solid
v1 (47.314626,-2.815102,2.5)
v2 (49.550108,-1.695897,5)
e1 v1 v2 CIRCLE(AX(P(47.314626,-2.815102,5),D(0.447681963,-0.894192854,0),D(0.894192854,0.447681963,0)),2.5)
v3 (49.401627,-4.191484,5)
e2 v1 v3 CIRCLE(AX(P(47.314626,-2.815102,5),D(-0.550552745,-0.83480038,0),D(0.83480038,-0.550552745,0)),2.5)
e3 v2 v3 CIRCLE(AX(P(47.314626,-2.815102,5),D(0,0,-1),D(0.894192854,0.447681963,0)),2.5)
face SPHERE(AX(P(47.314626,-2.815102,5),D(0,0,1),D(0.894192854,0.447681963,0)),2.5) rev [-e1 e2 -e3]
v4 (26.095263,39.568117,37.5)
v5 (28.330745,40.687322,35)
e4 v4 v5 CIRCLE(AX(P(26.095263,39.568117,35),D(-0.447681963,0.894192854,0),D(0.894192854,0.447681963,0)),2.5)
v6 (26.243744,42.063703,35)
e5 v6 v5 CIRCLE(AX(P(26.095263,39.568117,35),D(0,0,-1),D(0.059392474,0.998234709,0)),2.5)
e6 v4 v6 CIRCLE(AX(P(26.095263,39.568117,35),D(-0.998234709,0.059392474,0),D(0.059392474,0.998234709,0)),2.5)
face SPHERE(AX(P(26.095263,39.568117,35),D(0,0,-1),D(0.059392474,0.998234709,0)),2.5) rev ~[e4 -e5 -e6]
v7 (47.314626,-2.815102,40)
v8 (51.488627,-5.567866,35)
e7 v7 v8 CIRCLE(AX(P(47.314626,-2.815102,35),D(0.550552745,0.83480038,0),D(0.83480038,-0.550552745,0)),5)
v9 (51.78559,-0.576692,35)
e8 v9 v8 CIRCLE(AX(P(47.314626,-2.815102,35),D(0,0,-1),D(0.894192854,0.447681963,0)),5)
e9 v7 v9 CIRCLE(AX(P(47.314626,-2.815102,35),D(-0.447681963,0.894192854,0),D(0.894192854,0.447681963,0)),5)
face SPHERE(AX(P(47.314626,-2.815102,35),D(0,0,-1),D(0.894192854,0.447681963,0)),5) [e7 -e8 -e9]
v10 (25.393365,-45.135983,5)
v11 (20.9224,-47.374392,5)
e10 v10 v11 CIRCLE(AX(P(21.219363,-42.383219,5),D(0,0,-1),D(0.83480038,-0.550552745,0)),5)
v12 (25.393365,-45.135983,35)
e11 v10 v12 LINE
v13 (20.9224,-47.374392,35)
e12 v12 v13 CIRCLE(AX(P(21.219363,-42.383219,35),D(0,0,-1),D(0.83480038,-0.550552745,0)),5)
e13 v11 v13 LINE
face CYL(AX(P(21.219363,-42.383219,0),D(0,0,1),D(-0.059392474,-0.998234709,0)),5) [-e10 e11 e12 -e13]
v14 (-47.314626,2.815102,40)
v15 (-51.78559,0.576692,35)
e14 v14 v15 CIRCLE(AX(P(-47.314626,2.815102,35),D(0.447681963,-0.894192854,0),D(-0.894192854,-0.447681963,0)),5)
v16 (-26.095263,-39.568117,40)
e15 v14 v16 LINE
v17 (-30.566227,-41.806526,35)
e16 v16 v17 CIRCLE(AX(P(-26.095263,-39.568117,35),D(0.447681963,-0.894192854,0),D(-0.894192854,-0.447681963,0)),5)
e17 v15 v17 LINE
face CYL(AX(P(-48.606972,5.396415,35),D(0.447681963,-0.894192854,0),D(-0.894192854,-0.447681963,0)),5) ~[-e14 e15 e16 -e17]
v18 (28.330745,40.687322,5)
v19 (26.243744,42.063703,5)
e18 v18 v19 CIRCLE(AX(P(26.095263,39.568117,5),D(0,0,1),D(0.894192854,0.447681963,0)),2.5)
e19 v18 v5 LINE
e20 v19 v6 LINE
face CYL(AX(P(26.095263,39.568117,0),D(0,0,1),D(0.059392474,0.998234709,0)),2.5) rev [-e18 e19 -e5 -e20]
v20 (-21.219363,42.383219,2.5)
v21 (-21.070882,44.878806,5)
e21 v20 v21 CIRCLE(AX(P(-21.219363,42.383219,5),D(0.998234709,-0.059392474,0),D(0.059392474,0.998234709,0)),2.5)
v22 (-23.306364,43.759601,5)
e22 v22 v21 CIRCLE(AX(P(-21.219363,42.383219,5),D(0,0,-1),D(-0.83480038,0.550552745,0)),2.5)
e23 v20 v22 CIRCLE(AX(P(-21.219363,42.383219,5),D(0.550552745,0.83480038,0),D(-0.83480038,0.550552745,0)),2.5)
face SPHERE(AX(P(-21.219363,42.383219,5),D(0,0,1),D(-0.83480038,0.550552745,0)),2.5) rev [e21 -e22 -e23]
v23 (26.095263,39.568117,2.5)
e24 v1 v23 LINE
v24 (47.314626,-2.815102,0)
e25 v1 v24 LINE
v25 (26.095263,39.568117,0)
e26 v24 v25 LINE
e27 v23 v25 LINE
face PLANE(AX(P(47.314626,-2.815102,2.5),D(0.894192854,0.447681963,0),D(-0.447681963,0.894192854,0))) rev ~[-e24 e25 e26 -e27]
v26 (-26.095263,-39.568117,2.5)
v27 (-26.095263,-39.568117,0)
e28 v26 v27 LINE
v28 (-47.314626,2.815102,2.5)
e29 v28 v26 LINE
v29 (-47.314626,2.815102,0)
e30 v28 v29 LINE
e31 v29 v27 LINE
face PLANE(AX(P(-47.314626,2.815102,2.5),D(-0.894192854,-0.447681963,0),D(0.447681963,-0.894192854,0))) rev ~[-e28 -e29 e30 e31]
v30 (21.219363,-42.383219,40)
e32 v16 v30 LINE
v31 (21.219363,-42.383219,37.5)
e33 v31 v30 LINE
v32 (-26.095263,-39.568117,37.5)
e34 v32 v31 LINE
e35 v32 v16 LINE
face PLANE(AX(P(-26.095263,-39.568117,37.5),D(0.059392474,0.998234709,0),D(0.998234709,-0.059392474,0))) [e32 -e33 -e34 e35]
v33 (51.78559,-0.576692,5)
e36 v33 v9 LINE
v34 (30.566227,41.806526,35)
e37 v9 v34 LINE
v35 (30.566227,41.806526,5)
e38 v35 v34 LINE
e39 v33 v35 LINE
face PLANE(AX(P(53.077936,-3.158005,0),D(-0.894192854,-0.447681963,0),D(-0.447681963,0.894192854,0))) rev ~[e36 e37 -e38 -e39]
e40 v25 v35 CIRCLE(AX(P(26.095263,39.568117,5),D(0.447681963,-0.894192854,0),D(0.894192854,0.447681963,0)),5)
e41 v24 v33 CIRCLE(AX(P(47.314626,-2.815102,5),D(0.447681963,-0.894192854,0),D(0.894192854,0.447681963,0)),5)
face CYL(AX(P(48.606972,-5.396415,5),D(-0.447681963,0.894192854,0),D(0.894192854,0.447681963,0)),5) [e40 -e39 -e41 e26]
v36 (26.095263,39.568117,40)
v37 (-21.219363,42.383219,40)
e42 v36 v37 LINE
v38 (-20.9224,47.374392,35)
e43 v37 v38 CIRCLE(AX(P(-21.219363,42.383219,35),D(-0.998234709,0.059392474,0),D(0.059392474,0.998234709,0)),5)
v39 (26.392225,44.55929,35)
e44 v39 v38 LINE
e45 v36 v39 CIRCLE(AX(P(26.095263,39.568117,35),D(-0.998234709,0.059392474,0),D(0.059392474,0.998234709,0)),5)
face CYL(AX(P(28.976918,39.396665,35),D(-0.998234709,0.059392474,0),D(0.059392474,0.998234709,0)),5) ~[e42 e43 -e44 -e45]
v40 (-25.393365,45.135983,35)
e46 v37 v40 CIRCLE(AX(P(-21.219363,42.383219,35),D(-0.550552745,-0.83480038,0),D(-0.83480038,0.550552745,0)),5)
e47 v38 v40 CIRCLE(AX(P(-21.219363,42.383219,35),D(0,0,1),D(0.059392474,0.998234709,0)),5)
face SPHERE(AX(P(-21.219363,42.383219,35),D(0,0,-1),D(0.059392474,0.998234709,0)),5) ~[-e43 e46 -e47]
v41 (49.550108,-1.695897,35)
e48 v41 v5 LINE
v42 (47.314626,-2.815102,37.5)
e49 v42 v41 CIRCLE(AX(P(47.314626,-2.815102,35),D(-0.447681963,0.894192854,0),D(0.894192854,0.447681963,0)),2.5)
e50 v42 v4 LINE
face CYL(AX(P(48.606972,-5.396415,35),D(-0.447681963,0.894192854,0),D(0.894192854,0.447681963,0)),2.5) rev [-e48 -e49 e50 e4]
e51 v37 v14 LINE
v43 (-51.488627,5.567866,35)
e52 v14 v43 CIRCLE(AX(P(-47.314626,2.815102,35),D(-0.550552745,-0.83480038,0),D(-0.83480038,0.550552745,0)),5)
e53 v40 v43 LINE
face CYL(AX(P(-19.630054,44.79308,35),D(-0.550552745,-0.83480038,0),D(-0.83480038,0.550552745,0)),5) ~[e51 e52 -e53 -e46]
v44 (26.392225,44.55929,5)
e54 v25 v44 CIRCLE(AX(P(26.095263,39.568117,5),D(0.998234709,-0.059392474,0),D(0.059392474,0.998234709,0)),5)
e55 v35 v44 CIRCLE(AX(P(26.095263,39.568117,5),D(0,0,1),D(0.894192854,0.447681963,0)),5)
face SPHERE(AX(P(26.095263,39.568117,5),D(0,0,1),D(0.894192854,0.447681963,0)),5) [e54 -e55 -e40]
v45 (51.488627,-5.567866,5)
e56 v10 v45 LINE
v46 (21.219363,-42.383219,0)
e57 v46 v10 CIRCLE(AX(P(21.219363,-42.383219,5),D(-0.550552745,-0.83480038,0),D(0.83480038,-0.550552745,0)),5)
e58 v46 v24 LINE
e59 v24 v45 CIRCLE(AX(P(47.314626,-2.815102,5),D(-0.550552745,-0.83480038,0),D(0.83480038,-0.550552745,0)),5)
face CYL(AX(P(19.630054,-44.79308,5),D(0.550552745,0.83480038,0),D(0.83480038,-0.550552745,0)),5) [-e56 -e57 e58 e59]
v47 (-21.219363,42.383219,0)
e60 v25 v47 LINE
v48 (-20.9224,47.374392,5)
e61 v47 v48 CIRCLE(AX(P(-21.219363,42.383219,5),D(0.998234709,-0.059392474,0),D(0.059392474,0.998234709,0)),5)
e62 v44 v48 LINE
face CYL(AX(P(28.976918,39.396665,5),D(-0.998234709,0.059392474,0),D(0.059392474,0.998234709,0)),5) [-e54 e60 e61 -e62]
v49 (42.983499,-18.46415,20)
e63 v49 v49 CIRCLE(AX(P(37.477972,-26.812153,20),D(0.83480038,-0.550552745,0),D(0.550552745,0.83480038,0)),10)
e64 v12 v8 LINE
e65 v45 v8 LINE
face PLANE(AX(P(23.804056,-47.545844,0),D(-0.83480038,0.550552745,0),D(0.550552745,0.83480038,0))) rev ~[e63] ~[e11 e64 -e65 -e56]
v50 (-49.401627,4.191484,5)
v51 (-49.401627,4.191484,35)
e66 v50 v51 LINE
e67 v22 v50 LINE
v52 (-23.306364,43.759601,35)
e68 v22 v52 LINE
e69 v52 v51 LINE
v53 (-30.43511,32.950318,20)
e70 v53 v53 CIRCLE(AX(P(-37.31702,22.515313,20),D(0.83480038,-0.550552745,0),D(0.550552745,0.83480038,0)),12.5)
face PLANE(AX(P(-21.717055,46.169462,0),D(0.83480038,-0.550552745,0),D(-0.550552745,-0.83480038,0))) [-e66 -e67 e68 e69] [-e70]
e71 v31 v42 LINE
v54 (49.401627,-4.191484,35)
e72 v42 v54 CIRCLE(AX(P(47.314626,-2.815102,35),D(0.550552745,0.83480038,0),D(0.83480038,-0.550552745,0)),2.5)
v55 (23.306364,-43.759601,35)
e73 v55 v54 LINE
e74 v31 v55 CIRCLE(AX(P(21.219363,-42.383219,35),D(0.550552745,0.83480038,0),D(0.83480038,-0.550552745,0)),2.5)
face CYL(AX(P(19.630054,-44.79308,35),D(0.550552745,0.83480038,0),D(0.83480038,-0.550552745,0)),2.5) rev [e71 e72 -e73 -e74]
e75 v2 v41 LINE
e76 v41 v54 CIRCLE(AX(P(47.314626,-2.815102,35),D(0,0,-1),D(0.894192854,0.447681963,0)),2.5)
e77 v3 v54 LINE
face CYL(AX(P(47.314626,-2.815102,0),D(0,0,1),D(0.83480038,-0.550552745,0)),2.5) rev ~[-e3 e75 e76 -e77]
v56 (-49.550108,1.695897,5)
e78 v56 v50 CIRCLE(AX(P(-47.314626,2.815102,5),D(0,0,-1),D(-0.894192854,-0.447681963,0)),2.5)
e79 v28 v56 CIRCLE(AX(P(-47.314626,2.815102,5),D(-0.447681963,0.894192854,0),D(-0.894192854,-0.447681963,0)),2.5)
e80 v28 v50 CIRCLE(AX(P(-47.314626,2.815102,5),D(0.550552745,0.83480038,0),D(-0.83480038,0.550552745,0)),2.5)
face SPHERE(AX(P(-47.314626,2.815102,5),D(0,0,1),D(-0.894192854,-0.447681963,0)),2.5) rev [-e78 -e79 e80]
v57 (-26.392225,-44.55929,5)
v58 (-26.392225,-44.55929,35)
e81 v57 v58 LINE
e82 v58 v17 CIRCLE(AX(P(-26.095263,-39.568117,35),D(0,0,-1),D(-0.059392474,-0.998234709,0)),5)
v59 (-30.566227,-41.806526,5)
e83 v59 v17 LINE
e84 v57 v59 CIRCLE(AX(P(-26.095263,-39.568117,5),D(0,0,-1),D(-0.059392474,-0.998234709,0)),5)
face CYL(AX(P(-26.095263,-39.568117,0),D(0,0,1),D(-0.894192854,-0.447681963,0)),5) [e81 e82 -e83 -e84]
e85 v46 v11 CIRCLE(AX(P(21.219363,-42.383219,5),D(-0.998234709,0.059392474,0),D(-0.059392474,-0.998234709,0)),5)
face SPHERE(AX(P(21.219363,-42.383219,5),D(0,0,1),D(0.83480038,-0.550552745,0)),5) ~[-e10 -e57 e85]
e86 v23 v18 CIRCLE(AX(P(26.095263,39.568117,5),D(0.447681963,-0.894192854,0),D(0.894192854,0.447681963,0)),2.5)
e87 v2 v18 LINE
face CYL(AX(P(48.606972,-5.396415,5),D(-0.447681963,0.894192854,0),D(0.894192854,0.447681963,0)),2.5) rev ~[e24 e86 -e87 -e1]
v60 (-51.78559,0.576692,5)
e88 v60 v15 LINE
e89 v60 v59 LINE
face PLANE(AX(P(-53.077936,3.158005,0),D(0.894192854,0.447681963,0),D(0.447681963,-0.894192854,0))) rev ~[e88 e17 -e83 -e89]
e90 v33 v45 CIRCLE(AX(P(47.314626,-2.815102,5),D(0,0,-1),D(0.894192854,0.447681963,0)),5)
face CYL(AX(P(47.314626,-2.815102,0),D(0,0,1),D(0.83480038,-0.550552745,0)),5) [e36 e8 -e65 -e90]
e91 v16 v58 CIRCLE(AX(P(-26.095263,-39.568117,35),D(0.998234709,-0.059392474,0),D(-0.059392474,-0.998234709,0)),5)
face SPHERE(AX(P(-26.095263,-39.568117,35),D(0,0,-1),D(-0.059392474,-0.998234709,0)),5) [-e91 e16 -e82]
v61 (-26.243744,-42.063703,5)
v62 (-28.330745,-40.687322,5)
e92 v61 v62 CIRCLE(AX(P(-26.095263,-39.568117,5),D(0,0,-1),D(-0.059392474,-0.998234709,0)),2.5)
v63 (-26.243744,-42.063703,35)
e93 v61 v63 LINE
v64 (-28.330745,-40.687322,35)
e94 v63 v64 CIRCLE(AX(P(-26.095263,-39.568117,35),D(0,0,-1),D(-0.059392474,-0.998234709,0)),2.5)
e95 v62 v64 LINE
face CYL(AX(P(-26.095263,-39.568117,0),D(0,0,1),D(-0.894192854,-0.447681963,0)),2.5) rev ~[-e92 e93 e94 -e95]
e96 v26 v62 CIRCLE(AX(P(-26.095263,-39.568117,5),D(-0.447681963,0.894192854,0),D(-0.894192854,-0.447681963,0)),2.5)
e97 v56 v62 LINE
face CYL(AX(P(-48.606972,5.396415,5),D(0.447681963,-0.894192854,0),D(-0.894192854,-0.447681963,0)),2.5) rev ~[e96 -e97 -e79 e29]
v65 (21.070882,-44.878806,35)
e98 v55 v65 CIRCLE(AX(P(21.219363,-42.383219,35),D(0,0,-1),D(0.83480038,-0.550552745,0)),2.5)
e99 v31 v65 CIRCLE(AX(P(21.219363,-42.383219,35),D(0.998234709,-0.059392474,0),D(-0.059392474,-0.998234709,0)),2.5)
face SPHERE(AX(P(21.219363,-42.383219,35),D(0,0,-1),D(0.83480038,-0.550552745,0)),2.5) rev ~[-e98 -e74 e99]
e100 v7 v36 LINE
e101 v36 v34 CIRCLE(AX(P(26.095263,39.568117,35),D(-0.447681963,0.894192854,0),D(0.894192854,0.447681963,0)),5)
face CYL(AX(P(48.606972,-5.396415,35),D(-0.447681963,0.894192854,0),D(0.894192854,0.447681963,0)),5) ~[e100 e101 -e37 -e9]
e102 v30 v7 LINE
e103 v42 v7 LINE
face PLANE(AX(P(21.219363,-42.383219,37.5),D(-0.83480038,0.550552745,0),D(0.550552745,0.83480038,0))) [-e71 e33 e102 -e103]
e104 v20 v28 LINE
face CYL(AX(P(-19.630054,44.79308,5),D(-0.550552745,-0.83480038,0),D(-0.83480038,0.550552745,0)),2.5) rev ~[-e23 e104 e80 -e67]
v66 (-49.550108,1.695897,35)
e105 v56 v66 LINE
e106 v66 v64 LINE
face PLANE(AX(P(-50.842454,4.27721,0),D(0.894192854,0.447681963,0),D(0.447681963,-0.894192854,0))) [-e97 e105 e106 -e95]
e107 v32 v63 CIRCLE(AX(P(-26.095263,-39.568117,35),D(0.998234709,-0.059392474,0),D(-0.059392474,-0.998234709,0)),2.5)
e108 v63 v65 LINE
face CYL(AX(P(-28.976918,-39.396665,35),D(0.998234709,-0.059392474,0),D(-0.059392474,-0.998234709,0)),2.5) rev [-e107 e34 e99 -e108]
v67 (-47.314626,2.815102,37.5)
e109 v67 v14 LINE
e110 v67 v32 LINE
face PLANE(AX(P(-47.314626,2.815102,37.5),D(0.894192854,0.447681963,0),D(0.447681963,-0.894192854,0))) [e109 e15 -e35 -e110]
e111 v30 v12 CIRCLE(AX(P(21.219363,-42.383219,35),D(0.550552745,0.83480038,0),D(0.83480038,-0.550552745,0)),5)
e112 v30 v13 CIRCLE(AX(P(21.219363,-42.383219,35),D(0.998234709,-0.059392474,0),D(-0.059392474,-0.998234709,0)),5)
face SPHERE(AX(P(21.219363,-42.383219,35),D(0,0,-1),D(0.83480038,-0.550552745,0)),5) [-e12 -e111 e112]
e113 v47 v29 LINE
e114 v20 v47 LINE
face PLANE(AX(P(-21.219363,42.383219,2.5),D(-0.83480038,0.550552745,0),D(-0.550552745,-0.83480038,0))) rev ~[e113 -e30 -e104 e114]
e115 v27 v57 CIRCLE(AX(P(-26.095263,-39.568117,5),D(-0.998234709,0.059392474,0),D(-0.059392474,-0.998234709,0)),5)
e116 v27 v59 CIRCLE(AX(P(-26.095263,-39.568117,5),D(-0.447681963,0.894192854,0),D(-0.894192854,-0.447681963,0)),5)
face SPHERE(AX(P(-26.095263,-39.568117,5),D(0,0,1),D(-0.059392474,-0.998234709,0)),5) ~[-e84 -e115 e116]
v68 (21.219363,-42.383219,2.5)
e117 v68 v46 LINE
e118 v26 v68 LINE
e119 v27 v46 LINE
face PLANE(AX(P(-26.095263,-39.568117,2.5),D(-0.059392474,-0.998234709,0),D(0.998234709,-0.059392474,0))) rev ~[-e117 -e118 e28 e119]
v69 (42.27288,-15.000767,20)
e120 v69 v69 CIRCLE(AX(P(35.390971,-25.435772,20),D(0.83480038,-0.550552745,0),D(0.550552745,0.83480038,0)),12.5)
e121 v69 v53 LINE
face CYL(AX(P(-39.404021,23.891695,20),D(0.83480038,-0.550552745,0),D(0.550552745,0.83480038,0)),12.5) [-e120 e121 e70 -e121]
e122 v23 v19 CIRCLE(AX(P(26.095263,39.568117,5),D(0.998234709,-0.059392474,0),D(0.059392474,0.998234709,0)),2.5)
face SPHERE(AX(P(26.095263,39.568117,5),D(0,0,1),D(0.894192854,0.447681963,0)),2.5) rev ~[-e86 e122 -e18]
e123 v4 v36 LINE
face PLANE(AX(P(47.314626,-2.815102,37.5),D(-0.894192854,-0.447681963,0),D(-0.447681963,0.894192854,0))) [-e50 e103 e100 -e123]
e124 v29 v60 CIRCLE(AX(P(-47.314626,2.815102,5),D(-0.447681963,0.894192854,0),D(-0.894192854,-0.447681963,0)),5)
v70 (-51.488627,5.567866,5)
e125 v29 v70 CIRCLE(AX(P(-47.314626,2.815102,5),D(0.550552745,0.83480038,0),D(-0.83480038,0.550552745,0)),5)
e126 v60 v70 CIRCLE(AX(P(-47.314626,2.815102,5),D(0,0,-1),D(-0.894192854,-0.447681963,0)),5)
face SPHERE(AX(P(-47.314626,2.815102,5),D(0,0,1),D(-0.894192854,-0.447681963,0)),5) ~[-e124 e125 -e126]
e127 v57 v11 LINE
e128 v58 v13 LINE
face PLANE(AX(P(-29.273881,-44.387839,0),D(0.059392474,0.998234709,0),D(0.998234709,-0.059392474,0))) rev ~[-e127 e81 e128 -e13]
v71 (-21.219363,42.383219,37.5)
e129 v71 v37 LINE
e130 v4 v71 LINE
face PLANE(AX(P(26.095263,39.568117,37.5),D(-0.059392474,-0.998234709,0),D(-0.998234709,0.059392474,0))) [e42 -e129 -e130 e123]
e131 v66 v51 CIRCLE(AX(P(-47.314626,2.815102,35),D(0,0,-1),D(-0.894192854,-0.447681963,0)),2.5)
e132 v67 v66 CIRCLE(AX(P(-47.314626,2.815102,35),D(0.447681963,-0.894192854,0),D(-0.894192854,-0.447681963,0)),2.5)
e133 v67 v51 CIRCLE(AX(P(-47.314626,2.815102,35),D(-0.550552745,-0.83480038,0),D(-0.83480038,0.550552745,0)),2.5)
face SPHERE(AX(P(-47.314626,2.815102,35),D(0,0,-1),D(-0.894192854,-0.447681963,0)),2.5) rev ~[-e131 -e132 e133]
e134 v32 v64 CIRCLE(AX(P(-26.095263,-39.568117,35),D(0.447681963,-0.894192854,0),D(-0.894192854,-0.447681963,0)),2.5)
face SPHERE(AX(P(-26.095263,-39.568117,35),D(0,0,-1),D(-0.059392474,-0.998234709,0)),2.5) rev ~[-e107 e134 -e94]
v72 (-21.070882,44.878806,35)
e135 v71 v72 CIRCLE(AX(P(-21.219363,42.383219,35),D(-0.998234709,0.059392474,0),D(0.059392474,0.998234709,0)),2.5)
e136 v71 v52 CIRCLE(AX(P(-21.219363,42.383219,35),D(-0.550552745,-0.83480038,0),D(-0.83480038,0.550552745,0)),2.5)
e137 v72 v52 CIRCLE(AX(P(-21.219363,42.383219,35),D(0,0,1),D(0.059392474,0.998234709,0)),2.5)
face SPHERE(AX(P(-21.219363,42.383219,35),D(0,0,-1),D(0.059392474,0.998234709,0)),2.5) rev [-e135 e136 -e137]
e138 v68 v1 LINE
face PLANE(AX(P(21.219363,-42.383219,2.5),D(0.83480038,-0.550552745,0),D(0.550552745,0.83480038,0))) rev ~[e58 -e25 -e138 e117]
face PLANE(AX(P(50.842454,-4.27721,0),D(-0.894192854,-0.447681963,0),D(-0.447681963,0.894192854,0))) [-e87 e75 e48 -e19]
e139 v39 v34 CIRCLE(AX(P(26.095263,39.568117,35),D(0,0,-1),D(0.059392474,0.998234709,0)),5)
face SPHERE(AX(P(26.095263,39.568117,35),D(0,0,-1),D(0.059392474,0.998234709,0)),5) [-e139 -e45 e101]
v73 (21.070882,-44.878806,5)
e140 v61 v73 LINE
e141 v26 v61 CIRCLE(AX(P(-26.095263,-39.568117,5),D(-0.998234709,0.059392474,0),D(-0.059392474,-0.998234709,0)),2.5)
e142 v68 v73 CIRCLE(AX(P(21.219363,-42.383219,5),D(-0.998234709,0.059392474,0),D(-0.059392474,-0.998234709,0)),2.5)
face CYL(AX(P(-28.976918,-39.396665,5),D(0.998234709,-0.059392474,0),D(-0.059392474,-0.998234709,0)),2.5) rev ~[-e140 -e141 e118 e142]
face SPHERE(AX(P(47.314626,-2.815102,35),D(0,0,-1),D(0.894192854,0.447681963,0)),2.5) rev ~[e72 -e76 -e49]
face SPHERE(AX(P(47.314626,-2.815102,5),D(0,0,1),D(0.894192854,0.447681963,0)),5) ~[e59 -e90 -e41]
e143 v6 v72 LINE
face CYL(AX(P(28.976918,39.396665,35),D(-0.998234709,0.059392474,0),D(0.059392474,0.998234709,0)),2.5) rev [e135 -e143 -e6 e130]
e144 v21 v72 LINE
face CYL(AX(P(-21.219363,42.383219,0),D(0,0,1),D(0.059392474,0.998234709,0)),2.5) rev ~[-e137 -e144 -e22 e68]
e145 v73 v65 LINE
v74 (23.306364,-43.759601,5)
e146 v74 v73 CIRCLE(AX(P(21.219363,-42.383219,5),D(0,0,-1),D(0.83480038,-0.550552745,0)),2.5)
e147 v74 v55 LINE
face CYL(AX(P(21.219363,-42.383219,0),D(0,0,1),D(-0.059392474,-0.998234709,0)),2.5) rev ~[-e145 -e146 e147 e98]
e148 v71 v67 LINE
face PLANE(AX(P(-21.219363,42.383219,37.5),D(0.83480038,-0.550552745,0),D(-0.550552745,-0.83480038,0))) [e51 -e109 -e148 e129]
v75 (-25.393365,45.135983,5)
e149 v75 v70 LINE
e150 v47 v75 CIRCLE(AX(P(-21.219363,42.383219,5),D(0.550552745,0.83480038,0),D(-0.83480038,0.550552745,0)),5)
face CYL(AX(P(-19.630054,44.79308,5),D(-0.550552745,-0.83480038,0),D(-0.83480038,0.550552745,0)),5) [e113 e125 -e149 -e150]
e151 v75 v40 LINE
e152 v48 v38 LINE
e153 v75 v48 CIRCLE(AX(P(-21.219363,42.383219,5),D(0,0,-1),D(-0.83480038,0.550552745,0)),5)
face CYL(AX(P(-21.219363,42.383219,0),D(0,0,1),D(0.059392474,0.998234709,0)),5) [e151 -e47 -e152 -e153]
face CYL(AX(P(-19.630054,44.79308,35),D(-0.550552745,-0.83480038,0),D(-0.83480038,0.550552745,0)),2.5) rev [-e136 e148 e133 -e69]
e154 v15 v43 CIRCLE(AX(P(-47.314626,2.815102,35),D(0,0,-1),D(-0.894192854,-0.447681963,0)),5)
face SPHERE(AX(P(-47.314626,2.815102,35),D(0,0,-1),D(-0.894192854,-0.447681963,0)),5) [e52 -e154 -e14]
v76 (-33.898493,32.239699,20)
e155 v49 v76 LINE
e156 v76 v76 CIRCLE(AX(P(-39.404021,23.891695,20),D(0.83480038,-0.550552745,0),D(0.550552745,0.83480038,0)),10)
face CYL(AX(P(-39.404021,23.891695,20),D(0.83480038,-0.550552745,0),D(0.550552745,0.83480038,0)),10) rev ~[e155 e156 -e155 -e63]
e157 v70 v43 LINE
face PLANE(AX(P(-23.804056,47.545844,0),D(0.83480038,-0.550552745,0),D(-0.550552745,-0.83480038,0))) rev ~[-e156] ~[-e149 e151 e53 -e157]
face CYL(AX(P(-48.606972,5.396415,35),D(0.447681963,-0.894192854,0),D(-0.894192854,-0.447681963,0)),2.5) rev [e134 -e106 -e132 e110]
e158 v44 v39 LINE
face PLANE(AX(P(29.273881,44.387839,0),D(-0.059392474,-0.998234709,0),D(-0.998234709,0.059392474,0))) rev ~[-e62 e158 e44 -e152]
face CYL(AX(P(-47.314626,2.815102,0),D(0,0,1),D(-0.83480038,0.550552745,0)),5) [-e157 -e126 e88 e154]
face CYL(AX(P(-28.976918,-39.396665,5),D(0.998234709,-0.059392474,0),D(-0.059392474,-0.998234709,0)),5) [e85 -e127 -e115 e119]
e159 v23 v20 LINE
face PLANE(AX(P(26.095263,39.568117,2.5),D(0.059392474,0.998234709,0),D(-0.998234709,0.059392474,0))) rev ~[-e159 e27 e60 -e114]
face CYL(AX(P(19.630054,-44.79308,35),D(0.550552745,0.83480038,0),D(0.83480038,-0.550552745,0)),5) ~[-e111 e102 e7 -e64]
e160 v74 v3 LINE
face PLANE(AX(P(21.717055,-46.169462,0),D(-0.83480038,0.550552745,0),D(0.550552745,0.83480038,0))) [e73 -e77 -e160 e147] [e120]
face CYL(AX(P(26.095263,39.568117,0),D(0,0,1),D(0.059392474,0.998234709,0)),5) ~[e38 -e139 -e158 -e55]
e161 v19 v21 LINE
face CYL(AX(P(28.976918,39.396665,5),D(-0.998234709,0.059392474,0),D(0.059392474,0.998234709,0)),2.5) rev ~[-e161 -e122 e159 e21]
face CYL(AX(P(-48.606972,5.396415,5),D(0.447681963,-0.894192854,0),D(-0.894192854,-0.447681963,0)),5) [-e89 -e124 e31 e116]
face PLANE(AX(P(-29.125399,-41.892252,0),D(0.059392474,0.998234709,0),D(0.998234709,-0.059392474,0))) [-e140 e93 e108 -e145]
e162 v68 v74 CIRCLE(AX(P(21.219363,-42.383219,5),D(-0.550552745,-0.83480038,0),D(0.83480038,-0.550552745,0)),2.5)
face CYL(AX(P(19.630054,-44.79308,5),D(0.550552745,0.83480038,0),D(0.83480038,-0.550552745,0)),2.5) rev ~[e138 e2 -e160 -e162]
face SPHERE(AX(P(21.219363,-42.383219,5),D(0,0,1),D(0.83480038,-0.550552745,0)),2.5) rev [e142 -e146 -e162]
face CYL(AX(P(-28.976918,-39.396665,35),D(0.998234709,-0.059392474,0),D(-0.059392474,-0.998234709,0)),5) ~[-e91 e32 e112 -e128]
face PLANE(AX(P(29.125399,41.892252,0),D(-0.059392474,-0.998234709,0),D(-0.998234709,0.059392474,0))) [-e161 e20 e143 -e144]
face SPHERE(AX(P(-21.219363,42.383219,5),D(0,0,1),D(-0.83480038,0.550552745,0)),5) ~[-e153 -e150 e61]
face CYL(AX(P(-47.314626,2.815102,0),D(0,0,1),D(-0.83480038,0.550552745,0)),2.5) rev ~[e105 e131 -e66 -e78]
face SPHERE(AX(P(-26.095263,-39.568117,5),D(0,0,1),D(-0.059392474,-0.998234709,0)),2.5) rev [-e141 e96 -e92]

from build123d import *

# Parameters (mm, degrees)
F1_DEPTH       = 40
F2_R           = 5
F4_D           = 20
F4_CBORE_D     = 20
F4_CBORE_DEPTH = 20
F5_T           = -2.5


# Not quite as in the source:
# - a shell that OpenCascade refuses in one call is made with other operations: the cavity is built on its own and cut out


with BuildPart() as f1:
    # F0 (on Top) → F1 (new body)
    with BuildSketch(Plane.XY):
        Polygon((29.2738805136, 44.3878389125), (-23.8040558605, 47.5458436484), (-53.0779363741, 3.1580047359), (-29.2738805136, -44.3878389125), (23.8040558605, -47.5458436484), (53.0779363741, -3.1580047359), align=None)
    extrude(amount=F1_DEPTH)

    # F2
    f2_edges = [f1.edges().sort_by_distance(p)[0] for p in [
        (2.734912, 45.966841, 40),
        (41.175908, 20.614917, 40),
        (38.440996, -25.351924, 40),
        (-2.734912, -45.966841, 40),
        (-41.175908, -20.614917, 40),
        (-38.440996, 25.351924, 40),
        (29.273881, 44.387839, 20),
        (-23.804056, 47.545844, 20),
        (-53.077936, 3.158005, 20),
        (-29.273881, -44.387839, 20),
        (23.804056, -47.545844, 20),
        (53.077936, -3.158005, 20),
        (41.175908, 20.614917, 0),
        (38.440996, -25.351924, 0),
        (-2.734912, -45.966841, 0),
        (-41.175908, -20.614917, 0),
        (-38.440996, 25.351924, 0),
        (2.734912, 45.966841, 0),
    ]]
    fillet(f2_edges, radius=F2_R)

    # F4 (through all)
    with Locations(Plane(origin=(-38.4409961173, 25.3519241922, 0), x_dir=(-0.5505527454, -0.83480038, 0), z_dir=(-0.83480038, 0.5505527454, 0))):
        with Locations((1.7491957406, 20)):
            CounterBoreHole(F4_D / 2, F4_CBORE_D / 2, F4_CBORE_DEPTH)

    # F5: a shell. OpenCascade refuses it in one call, so the cavity is built on its own and cut out:
    # the body offset inwards by the wall thickness, plus a prism from it out through each open face.
    f5_core = offset(f1.part, amount=F5_T, mode=Mode.PRIVATE)
    f5_exits = [f5_core.faces().sort_by_distance(p)[0] for p in [
        (0, 0, 2.5),
        (0, 0, 37.5),
    ]]
    add(f5_core, mode=Mode.SUBTRACT)
    extrude(f5_exits, amount=-F5_T, mode=Mode.SUBTRACT)


solid = f1.part
